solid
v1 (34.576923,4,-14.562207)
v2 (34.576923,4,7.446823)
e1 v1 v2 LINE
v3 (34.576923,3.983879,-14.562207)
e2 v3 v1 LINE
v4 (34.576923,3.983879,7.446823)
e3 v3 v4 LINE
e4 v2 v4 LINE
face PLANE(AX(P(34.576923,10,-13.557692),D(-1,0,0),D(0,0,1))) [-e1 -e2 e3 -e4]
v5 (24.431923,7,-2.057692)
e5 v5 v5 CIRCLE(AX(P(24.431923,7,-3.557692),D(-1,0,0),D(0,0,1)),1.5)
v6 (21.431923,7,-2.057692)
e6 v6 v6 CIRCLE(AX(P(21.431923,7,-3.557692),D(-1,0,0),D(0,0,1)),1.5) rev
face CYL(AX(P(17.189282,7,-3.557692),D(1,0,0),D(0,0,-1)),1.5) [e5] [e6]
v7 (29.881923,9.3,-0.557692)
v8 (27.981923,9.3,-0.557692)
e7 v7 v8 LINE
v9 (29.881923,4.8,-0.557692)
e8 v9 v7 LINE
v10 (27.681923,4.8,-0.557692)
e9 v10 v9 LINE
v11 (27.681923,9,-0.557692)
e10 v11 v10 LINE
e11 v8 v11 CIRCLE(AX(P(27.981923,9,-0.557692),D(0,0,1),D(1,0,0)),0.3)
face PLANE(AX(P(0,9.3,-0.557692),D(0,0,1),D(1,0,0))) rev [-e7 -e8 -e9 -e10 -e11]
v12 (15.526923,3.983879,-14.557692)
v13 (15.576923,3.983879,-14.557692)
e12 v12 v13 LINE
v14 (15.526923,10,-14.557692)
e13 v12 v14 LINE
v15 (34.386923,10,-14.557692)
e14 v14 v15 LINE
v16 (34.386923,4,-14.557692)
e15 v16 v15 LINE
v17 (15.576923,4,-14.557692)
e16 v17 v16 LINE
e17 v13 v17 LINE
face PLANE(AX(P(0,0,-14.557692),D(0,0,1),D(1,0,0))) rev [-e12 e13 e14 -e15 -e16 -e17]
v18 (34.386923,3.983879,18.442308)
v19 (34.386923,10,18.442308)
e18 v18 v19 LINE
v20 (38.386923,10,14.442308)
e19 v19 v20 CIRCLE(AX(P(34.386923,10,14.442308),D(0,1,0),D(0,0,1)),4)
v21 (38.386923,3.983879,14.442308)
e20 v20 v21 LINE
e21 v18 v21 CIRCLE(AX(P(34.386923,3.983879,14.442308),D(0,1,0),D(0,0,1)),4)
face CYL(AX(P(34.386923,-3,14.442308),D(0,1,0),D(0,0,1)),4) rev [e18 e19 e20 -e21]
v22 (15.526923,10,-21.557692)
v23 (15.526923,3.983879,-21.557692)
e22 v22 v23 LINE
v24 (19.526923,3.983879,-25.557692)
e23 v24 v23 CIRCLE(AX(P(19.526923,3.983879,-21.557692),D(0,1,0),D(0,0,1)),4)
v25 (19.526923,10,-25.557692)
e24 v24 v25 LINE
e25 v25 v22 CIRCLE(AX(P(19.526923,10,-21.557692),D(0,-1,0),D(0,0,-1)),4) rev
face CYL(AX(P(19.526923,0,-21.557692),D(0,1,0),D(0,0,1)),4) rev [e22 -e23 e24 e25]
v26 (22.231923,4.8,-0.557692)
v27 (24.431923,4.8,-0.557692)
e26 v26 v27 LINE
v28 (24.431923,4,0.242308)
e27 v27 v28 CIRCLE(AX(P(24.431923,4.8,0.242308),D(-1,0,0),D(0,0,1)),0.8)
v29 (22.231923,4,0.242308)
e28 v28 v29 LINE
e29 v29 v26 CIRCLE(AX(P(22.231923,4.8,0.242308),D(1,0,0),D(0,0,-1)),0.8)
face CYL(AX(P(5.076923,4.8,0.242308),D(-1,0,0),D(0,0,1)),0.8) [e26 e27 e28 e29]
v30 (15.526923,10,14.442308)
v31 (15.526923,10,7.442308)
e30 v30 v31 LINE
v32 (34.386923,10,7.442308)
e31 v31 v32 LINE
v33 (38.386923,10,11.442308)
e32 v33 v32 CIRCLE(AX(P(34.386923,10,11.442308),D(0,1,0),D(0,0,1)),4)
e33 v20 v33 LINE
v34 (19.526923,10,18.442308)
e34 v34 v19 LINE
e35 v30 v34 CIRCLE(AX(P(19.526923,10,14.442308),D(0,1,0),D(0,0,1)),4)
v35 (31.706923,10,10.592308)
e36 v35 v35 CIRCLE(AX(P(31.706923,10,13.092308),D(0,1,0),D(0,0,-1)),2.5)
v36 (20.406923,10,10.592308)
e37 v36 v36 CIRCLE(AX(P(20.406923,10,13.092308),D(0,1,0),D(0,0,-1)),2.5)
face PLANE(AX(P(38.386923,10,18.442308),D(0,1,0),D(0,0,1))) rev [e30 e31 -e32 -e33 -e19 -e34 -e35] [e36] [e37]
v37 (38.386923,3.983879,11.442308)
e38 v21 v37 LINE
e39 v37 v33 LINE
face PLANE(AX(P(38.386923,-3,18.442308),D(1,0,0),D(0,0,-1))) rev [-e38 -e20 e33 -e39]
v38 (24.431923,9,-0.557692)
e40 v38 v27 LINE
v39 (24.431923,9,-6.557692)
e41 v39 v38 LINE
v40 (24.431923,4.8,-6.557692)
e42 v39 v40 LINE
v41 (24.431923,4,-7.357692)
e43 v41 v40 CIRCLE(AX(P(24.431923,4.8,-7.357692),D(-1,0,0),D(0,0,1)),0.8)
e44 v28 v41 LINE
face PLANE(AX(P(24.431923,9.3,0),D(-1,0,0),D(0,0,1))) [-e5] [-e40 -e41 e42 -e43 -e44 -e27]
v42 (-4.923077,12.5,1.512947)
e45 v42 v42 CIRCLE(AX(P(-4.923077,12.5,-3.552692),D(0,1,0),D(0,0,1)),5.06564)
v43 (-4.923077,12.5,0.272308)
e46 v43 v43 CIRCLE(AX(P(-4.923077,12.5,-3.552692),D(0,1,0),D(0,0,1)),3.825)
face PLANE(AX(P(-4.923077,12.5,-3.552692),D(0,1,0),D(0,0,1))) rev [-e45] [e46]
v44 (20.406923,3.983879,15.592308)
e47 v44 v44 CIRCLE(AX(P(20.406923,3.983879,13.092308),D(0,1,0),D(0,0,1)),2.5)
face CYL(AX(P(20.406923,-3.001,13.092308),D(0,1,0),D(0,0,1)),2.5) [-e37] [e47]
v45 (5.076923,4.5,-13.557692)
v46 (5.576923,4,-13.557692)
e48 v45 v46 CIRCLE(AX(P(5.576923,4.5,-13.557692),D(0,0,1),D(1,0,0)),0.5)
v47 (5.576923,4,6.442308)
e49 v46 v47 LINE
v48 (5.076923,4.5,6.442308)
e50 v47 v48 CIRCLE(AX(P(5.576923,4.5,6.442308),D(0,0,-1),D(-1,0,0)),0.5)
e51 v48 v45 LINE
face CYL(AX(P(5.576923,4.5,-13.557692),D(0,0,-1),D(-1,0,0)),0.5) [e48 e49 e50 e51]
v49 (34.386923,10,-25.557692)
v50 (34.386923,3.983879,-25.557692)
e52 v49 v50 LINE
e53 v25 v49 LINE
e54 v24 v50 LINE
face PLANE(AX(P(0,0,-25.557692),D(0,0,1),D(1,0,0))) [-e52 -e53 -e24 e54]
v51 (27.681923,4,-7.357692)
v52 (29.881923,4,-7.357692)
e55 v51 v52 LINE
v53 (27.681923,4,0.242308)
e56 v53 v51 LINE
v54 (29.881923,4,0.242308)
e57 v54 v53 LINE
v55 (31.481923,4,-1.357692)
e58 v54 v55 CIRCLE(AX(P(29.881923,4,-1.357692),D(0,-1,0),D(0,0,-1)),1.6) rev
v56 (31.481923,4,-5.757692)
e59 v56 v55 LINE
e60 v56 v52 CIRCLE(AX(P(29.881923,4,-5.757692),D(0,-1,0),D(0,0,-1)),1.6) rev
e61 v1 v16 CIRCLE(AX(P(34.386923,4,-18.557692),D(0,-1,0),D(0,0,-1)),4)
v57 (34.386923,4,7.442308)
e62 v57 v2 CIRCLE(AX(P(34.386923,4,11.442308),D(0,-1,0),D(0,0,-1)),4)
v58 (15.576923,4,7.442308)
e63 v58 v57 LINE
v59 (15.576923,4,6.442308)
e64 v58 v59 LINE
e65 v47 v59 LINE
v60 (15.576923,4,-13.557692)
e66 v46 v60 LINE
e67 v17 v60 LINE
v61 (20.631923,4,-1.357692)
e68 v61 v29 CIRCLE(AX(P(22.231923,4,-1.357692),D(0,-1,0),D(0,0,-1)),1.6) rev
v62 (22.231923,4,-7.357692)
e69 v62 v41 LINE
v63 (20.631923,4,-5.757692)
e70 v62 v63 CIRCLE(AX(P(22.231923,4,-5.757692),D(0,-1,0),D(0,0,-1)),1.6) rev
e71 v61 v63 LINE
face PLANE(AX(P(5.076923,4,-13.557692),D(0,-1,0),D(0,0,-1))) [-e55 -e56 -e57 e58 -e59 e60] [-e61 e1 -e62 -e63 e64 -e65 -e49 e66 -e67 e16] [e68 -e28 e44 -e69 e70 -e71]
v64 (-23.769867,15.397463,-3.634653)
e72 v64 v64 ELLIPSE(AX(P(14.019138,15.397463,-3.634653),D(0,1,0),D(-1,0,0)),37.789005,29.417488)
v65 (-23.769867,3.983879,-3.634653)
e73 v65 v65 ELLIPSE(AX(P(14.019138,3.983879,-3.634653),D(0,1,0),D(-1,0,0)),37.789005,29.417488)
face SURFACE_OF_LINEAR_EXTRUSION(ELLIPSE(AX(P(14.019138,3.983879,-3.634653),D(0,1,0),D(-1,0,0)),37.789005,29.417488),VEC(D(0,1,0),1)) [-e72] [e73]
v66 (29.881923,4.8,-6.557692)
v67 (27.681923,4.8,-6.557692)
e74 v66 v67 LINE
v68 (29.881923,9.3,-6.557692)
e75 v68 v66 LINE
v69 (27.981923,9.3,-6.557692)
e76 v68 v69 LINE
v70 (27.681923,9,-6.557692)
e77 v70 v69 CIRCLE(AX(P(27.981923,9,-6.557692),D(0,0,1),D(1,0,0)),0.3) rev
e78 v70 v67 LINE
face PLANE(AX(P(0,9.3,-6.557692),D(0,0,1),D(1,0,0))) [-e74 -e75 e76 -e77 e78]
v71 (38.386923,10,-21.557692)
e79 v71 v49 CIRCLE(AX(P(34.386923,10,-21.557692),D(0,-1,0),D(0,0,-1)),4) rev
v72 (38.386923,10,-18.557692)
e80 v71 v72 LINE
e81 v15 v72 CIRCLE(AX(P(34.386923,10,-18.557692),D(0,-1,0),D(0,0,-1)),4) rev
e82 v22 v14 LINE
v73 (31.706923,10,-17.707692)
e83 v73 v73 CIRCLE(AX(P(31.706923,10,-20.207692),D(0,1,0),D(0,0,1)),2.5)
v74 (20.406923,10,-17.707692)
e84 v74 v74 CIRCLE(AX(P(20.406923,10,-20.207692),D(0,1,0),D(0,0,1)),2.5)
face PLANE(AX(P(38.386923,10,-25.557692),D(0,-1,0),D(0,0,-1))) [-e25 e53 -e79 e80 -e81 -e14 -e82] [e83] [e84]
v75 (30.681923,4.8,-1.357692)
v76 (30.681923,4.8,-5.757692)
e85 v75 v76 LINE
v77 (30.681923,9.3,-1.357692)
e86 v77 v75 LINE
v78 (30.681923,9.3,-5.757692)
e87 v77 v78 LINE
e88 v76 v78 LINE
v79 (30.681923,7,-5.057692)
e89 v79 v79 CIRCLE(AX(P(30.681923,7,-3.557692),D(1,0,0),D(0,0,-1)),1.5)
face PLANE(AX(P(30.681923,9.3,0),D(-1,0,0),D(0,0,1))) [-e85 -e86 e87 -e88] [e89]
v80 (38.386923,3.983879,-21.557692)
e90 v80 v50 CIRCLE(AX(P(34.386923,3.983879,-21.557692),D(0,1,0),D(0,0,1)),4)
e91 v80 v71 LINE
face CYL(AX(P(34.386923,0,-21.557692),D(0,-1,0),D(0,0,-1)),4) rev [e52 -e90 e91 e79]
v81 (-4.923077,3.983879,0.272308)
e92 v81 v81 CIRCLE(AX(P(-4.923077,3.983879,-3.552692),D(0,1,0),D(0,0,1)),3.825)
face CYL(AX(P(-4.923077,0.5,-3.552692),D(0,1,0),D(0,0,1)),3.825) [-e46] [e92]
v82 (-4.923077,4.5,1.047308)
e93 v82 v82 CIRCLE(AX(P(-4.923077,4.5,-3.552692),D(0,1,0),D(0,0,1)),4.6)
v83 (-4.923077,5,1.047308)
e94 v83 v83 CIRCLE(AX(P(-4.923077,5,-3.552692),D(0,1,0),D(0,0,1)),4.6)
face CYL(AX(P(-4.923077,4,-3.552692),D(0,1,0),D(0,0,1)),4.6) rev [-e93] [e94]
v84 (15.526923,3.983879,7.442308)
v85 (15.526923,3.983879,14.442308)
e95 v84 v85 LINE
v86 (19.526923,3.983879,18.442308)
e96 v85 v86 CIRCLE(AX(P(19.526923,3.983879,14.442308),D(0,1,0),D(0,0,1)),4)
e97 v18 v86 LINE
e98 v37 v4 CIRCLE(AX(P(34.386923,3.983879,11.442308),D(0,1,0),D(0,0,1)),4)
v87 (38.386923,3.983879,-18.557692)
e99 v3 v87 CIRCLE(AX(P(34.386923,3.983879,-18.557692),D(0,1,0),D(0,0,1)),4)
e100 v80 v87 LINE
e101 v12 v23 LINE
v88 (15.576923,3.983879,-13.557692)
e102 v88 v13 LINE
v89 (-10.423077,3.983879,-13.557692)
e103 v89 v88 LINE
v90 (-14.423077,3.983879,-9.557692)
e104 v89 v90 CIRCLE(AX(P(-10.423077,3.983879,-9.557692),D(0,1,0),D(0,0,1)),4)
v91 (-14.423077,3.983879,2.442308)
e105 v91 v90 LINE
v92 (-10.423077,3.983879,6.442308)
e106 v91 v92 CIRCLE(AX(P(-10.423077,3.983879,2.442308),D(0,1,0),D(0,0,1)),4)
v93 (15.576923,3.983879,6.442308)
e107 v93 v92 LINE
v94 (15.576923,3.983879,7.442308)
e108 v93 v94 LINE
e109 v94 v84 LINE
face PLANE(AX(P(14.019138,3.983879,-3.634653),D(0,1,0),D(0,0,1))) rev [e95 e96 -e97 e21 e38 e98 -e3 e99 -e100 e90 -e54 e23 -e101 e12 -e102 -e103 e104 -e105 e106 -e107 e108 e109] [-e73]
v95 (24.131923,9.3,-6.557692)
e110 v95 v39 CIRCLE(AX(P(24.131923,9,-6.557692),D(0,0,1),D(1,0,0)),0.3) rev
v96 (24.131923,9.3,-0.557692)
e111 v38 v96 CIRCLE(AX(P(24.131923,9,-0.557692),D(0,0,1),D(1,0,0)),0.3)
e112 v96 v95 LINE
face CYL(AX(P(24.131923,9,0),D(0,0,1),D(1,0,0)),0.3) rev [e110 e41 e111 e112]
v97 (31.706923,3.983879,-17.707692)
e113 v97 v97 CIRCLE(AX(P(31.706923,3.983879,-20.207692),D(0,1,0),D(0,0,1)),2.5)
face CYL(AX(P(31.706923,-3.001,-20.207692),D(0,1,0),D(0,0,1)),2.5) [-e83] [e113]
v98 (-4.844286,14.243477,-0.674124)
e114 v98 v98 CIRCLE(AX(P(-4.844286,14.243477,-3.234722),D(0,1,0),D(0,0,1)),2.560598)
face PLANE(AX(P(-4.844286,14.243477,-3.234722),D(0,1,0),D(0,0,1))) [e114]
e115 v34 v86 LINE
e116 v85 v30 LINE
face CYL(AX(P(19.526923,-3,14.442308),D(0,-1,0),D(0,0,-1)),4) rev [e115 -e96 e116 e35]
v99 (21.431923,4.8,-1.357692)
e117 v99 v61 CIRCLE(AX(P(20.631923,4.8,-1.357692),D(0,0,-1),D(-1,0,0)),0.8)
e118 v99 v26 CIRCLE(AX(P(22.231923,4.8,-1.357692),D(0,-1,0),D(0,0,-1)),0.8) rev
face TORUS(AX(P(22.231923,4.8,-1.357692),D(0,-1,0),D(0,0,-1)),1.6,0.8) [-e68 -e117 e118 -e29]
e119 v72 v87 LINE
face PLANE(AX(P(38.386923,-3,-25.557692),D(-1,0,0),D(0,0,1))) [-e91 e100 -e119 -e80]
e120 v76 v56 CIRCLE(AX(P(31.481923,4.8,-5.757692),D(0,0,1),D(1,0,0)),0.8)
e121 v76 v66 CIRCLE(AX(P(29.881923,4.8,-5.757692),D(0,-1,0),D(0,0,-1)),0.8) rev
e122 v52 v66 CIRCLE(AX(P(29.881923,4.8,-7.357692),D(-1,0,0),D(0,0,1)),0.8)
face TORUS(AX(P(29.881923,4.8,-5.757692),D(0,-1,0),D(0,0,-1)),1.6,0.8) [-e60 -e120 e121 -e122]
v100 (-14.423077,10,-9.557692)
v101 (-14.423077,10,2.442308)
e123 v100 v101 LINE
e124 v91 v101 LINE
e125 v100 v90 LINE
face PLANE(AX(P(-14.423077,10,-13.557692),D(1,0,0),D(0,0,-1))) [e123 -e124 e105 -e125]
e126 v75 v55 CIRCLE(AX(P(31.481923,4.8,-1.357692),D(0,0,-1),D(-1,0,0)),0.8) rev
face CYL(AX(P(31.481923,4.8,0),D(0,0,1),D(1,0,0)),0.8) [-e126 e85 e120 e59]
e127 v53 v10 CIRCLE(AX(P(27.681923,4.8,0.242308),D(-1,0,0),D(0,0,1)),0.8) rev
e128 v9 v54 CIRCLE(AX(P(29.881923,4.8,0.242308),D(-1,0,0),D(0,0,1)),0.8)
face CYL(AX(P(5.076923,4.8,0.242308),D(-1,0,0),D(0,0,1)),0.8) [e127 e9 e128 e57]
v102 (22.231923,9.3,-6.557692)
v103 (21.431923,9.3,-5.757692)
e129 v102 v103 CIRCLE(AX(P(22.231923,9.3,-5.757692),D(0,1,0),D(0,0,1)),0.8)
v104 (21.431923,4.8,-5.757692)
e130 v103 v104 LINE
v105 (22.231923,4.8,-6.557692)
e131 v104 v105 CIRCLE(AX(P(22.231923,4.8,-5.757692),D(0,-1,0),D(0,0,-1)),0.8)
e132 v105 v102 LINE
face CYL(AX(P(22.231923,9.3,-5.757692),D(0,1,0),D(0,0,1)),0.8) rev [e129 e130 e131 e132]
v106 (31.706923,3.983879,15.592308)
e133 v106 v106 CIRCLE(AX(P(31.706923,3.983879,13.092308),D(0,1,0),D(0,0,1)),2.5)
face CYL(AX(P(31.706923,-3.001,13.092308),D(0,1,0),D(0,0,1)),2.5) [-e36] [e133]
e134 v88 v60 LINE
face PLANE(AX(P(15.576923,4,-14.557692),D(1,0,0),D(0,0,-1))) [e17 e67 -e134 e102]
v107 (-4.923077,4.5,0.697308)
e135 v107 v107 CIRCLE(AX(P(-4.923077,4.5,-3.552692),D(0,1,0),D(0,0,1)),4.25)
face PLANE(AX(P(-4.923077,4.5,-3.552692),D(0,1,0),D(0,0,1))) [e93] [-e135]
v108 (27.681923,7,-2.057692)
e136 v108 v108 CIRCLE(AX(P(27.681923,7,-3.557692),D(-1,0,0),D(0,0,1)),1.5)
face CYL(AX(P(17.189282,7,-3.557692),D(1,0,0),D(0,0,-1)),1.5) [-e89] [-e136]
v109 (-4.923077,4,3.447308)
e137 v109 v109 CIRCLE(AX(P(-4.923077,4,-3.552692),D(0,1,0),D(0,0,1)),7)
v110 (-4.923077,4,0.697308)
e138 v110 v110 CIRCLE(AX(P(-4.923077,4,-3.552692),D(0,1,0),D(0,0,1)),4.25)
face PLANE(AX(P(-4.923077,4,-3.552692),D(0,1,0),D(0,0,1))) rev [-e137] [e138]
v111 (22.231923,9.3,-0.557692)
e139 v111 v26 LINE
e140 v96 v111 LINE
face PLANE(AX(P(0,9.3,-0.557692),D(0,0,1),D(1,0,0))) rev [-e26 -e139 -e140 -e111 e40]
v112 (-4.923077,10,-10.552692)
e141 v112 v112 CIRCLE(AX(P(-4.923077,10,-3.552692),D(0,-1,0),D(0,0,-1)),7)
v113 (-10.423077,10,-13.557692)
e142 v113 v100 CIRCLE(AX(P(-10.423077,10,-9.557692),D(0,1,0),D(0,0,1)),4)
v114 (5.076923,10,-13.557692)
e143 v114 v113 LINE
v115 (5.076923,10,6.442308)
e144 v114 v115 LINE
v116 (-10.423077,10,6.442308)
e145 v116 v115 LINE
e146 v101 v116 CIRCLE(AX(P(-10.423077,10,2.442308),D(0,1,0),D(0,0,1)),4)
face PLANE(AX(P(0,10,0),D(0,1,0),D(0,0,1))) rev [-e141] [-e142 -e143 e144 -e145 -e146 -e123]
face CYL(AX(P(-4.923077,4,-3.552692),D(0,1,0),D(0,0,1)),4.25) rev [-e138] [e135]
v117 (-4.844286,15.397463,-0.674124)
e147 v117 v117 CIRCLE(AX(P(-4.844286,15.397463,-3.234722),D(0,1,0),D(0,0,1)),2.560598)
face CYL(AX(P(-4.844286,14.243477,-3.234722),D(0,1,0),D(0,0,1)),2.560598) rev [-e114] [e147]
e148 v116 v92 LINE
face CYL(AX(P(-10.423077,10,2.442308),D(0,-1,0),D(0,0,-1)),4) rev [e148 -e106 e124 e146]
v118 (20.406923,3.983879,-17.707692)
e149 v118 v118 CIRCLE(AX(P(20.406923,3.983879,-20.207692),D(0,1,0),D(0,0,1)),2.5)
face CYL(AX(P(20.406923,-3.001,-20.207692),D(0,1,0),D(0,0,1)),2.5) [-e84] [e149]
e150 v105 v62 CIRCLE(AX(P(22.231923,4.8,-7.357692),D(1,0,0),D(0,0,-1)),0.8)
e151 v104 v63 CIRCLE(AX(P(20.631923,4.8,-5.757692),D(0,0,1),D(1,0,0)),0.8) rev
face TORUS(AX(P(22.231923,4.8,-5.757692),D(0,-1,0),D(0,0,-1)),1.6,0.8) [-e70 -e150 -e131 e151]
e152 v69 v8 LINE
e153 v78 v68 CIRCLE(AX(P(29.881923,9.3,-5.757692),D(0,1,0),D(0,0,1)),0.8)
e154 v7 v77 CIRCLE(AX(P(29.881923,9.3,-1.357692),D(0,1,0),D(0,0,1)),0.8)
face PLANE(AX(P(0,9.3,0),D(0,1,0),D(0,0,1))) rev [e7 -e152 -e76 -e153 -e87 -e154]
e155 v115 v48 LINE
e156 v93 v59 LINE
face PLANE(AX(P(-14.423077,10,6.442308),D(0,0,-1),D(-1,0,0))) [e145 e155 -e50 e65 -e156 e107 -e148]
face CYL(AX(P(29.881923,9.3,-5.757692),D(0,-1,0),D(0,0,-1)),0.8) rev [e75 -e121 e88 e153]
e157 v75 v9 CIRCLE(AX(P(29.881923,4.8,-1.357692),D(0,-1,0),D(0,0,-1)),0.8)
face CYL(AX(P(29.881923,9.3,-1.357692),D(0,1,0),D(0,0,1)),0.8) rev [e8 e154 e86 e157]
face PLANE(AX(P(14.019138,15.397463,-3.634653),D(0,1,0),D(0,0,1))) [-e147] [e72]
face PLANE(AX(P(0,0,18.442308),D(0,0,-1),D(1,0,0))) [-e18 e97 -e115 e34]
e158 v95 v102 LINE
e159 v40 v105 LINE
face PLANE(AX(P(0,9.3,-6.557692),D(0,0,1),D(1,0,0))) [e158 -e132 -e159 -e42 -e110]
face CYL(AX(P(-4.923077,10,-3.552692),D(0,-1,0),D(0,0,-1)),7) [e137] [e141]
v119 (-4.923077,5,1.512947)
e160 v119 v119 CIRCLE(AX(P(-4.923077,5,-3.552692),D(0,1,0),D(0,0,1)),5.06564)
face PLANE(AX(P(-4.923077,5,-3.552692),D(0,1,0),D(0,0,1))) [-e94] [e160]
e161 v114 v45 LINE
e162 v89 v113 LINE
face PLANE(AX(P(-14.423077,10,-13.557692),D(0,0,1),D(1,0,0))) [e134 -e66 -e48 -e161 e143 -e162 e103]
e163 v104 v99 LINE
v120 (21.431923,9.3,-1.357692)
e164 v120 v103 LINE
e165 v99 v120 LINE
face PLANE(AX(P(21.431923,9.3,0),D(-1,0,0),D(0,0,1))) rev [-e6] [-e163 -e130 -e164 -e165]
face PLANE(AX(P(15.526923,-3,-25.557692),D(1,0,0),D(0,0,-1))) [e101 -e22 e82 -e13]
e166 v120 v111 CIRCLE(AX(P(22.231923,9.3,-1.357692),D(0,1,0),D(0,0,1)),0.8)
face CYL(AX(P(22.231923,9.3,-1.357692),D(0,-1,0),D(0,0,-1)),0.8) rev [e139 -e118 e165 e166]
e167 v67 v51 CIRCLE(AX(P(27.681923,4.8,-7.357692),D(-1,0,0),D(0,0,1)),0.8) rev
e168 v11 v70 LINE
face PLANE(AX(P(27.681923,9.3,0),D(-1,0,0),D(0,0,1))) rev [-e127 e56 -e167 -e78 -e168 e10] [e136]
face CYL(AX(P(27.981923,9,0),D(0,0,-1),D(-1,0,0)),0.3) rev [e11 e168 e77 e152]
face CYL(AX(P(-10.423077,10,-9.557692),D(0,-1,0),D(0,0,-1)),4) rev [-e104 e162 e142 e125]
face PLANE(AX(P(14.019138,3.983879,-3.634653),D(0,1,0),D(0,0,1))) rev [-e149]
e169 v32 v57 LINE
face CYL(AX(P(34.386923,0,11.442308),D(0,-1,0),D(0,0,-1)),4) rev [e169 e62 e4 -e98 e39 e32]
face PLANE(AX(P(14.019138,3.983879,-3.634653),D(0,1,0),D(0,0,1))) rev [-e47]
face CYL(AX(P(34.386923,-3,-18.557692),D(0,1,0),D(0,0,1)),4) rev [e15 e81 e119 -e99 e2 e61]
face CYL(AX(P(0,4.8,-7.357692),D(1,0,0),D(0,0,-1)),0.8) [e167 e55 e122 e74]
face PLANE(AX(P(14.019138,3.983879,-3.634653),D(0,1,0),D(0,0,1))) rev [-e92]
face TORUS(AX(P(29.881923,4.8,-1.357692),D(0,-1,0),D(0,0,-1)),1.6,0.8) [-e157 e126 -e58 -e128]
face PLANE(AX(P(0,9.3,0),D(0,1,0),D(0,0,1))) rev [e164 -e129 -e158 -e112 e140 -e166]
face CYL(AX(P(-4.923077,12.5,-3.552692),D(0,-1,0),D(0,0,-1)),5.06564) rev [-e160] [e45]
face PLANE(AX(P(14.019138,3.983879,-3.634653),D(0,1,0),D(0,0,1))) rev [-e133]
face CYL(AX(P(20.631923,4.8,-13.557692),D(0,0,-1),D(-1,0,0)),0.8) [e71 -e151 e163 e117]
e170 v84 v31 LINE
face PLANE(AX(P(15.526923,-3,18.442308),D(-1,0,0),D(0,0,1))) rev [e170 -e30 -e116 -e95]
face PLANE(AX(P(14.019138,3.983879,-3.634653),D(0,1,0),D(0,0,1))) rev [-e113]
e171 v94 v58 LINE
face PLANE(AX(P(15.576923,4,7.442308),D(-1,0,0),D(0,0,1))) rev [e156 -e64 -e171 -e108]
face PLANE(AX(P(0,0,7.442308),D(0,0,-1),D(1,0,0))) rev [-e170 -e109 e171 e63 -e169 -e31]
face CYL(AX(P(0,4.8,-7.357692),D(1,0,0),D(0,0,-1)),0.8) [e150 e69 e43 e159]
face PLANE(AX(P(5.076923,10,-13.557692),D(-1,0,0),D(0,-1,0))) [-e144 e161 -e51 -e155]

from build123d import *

# Parameters (mm, degrees)
SKETCH2_W                 = 49
SKETCH2_H                 = 20
BOSS_EXTRUDE1_DEPTH       = 10
SKETCH3_W                 = 30
SKETCH3_H                 = 3.02
CUT_EXTRUDE1_DEPTH        = 2
SKETCH4_W                 = 5
SKETCH4_H                 = 6
CUT_EXTRUDE2_DEPTH        = 5
SKETCH5_R                 = 7
CUT_EXTRUDE3_DEPTH        = 38.474986727
SKETCH12_W                = 5
SKETCH12_H                = 6
BOSS_EXTRUDE4_DEPTH       = 0.8
SKETCH14_W                = 29.5
SKETCH14_H                = 6
CUT_EXTRUDE6_DEPTH        = 42.177221974
SKETCH20_W                = 5
SKETCH20_H                = 6
BOSS_EXTRUDE6_DEPTH       = 4.2
SKETCH21_R                = 4.6
CUT_EXTRUDE8_DEPTH        = 0.5
SKETCH22_R                = 3.825
CUT_EXTRUDE9_DEPTH        = 4
SKETCH24_R                = 4.6
SKETCH24_R_2              = 4.25
CUT_EXTRUDE11_DEPTH       = 1
BOSS_EXTRUDE9_START       = 8
SKETCH26_R                = 5.065639608
SKETCH26_R_2              = 3.825
BOSS_EXTRUDE9_DEPTH       = 8
SKETCH27_R                = 7
SKETCH27_R_2              = 4.6
CUT_EXTRUDE12_DEPTH       = 1
FILLET1_R                 = 0.5
SKETCH56_R                = 2
CUT_EXTRUDE13_DEPTH       = 2
SKETCH57_W                = 3
SKETCH57_H                = 6
BOSS_EXTRUDE19_DEPTH      = 5.3
CUT_EXTRUDE14_REACH       = 50.729
SKETCH58_R                = 1.5
FILLET2_R                 = 0.3
FILLET3_R                 = 0.8
SKETCH60_W                = 19
SKETCH60_H                = 4
BOSS_EXTRUDE21_DEPTH      = 1
SKETCH59_W                = 22.86
SKETCH59_H                = 13
BOSS_EXTRUDE20_DEPTH      = 11
CUT_EXTRUDE15_REACH       = 49.914
SKETCH61_R                = 2.5
FILLET4_R                 = 4
BOSS_EXTRUDE23_DEPTH      = 11.397463213
BOSS_EXTRUDE23_DEPTH_BACK = 0.01612128
SKETCH63_RX               = 37.789005123
SKETCH63_RY               = 29.417488172
SKETCH66_R                = 2.560598318
CUT_EXTRUDE16_DEPTH       = 1.153986273


with BuildPart() as part:
    # Sketch2 → Boss-Extrude1 (new body)
    with BuildSketch(Plane(origin=(0, 0, 0), x_dir=(1, 0, 0), z_dir=(0, 1, 0))):
        with Locations((10.076923077, 3.557692308)):
            Rectangle(SKETCH2_W, SKETCH2_H)
    extrude(amount=BOSS_EXTRUDE1_DEPTH)

    # Sketch3 → Cut-Extrude1 (cut)
    with BuildSketch(Plane.XZ):
        with Locations((12.576923077, -3.557692308)):
            Rectangle(SKETCH3_W, SKETCH3_H)
    extrude(amount=-CUT_EXTRUDE1_DEPTH, mode=Mode.SUBTRACT)

    # Sketch4 → Cut-Extrude2 (cut)
    with BuildSketch(Plane.XZ):
        with Locations((-4.923076923, -3.547692308)):
            Rectangle(SKETCH4_W, SKETCH4_H)
    extrude(amount=-CUT_EXTRUDE2_DEPTH, mode=Mode.SUBTRACT)

    # Sketch5 → Cut-Extrude3 (cut, through all)
    with BuildSketch(Plane.XZ.offset(-5)):
        with Locations(Location((-4.923076923, -3.552692308, 0), (0, 0, 270))):
            Circle(SKETCH5_R)
    extrude(amount=-CUT_EXTRUDE3_DEPTH, mode=Mode.SUBTRACT)

    # Sketch12 → Boss-Extrude4 (add)
    with BuildSketch(Plane.XZ):
        with Locations((-4.923076923, -3.547692308)):
            Rectangle(SKETCH12_W, SKETCH12_H)
    extrude(amount=-BOSS_EXTRUDE4_DEPTH)

    # Sketch14 → Cut-Extrude6 (cut, through all)
    with BuildSketch(Plane.XY.offset(6.442307692)):
        with Locations((19.826923077, 7)):
            Rectangle(SKETCH14_W, SKETCH14_H)
    extrude(amount=-CUT_EXTRUDE6_DEPTH, mode=Mode.SUBTRACT)

    # Sketch20 → Boss-Extrude6 (add)
    with BuildSketch(Plane(origin=(0, 0.8, 0), x_dir=(1, 0, 0), z_dir=(0, 1, 0))):
        with Locations((-4.923076923, 3.547692308)):
            Rectangle(SKETCH20_W, SKETCH20_H)
    extrude(amount=BOSS_EXTRUDE6_DEPTH)

    # Sketch21 → Cut-Extrude8 (cut)
    with BuildSketch(Plane(origin=(0, 5, 0), x_dir=(1, 0, 0), z_dir=(0, 1, 0))):
        with Locations(Location((-4.923076923, 3.552692308, 0), (0, 0, 270))):
            Circle(SKETCH21_R)
    extrude(amount=-CUT_EXTRUDE8_DEPTH, mode=Mode.SUBTRACT)

    # Sketch22 → Cut-Extrude9 (cut)
    with BuildSketch(Plane(origin=(0, 4.5, 0), x_dir=(1, 0, 0), z_dir=(0, 1, 0))):
        with Locations(Location((-4.923076923, 3.552692308, 0), (0, 0, 270))):
            Circle(SKETCH22_R)
    extrude(amount=-CUT_EXTRUDE9_DEPTH, mode=Mode.SUBTRACT)

    # Sketch24 → Cut-Extrude11 (cut)
    with BuildSketch(Plane(origin=(0, 5, 0), x_dir=(1, 0, 0), z_dir=(0, 1, 0))):
        with Locations(Location((-4.923076923, 3.552692308, 0), (0, 0, 270))):
            Circle(SKETCH24_R)
        with Locations(Location((-4.923076923, 3.552692308, 0), (0, 0, 270))):
            Circle(SKETCH24_R_2, mode=Mode.SUBTRACT)
    extrude(amount=-CUT_EXTRUDE11_DEPTH, mode=Mode.SUBTRACT)

    # Sketch26 → Boss-Extrude9 (add)
    with BuildSketch(Plane(origin=(0, 4.5, 0), x_dir=(1, 0, 0), z_dir=(0, 1, 0)).offset(BOSS_EXTRUDE9_START)):
        with Locations(Location((-4.923076923, 3.552692308, 0), (0, 0, 90))):
            Circle(SKETCH26_R)
        with Locations(Location((-4.923076923, 3.552692308, 0), (0, 0, 270))):
            Circle(SKETCH26_R_2, mode=Mode.SUBTRACT)
    extrude(amount=-BOSS_EXTRUDE9_DEPTH)

    # Sketch27 → Cut-Extrude12 (cut)
    with BuildSketch(Plane(origin=(0, 5, 0), x_dir=(1, 0, 0), z_dir=(0, 1, 0))):
        with Locations(Location((-4.923076923, 3.552692308, 0), (0, 0, 90))):
            Circle(SKETCH27_R)
        with Locations(Location((-4.923076923, 3.552692308, 0), (0, 0, 270))):
            Circle(SKETCH27_R_2, mode=Mode.SUBTRACT)
    extrude(amount=-CUT_EXTRUDE12_DEPTH, mode=Mode.SUBTRACT)

    # Fillet1
    fillet1_edges = [part.edges().sort_by_distance(p)[0] for p in [
        (5.076923077, 4, -3.557692308),
    ]]
    fillet(fillet1_edges, radius=FILLET1_R)

    # Sketch56 → Cut-Extrude13 (cut)
    with BuildSketch(Plane.XZ):
        with Locations((28.926923077, -3.557692308)):
            Circle(SKETCH56_R)
    extrude(amount=-CUT_EXTRUDE13_DEPTH, mode=Mode.SUBTRACT)

    # Sketch57 → Boss-Extrude19 (add)
    with BuildSketch(Plane(origin=(0, 4, 0), x_dir=(1, 0, 0), z_dir=(0, 1, 0))):
        with Locations((29.181923077, 3.557692308)):
            Rectangle(SKETCH57_W, SKETCH57_H)
        with Locations((22.931923077, 3.557692308)):
            Rectangle(SKETCH57_W, SKETCH57_H)
    extrude(amount=BOSS_EXTRUDE19_DEPTH)

    # Cut-Extrude14: up to this face of the body (flat: up to its plane)
    cut_extrude14_end = Plane(part.part.faces().sort_by_distance((21.431923077, 6.65, -3.557692308))[0])
    # Sketch58 → Cut-Extrude14 (cut, up to the picked face)
    with BuildSketch(Plane(origin=(30.681923077, 0, 0), x_dir=(0, 0, -1), z_dir=(1, 0, 0)), mode=Mode.PRIVATE) as cut_extrude14_sk1:
        with Locations(Location((3.557692308, 7, 0), (0, 0, 180))):
            Circle(SKETCH58_R)
    cut_extrude14_tool1 = split(extrude(cut_extrude14_sk1.sketch, amount=-CUT_EXTRUDE14_REACH, mode=Mode.PRIVATE), bisect_by=cut_extrude14_end, keep=Keep.BOTH, mode=Mode.PRIVATE)
    add(cut_extrude14_tool1.solids().sort_by(Axis((30.681923, 7, -3.557692), (-1, 0, 0)))[0], mode=Mode.SUBTRACT)

    # Fillet2
    fillet2_edges = [part.edges().sort_by_distance(p)[0] for p in [
        (27.681923077, 9.3, -3.557692308),
        (24.431923077, 9.3, -3.557692308),
    ]]
    fillet(fillet2_edges, radius=FILLET2_R)

    # Fillet3
    fillet3_edges = [part.edges().sort_by_distance(p)[0] for p in [
        (30.681923077, 4, -3.557692308),
        (30.681923077, 6.65, -0.557692308),
        (29.181923077, 4, -6.557692308),
        (30.681923077, 6.65, -6.557692308),
        (29.181923077, 4, -0.557692308),
        (21.431923077, 6.65, -6.557692308),
        (21.431923077, 6.65, -0.557692308),
        (22.931923077, 4, -6.557692308),
        (21.431923077, 4, -3.557692308),
        (22.931923077, 4, -0.557692308),
    ]]
    fillet(fillet3_edges, radius=FILLET3_R)

    # Sketch60 → Boss-Extrude21 (add)
    with BuildSketch(Plane(origin=(0, 0, -13.557692308), x_dir=(-1, 0, 0), z_dir=(0, 0, -1))):
        with Locations((-25.076923077, 2)):
            Rectangle(SKETCH60_W, SKETCH60_H)
    boss_extrude21 = extrude(amount=BOSS_EXTRUDE21_DEPTH)

    # Sketch59 → Boss-Extrude20 (add)
    with BuildSketch(Plane(origin=(0, 0, -14.557692308), x_dir=(-1, 0, 0), z_dir=(0, 0, -1))):
        with Locations((-26.956923077, 3.5)):
            Rectangle(SKETCH59_W, SKETCH59_H)
    boss_extrude20 = extrude(amount=BOSS_EXTRUDE20_DEPTH)

    # Mirror4: Boss-Extrude21, Boss-Extrude20 across plane
    add(boss_extrude21.mirror(Plane(origin=(0, 0, -3.557692308), x_dir=(1, 0, 0), z_dir=(0, 0, -1))))
    add(boss_extrude20.mirror(Plane(origin=(0, 0, -3.557692308), x_dir=(1, 0, 0), z_dir=(0, 0, -1))))

    # Sketch61 → Cut-Extrude15 (cut, up to next)
    with BuildSketch(Plane(origin=(0, 10, 0), x_dir=(1, 0, 0), z_dir=(0, 1, 0)), mode=Mode.PRIVATE) as cut_extrude15_sk1:
        with Locations(Location((20.406923077, 20.207692308, 0), (0, 0, 270))):
            Circle(SKETCH61_R)
    cut_extrude15_tool1 = extrude(cut_extrude15_sk1.sketch, amount=-CUT_EXTRUDE15_REACH, mode=Mode.PRIVATE) & part.part
    # Sketch61 → Cut-Extrude15 (cut, up to next)
    with BuildSketch(Plane(origin=(0, 10, 0), x_dir=(1, 0, 0), z_dir=(0, 1, 0)), mode=Mode.PRIVATE) as cut_extrude15_sk2:
        with Locations(Location((31.706923077, 20.207692308, 0), (0, 0, 270))):
            Circle(SKETCH61_R)
    cut_extrude15_tool2 = extrude(cut_extrude15_sk2.sketch, amount=-CUT_EXTRUDE15_REACH, mode=Mode.PRIVATE) & part.part
    # Sketch61 → Cut-Extrude15 (cut, up to next)
    with BuildSketch(Plane(origin=(0, 10, 0), x_dir=(1, 0, 0), z_dir=(0, 1, 0)), mode=Mode.PRIVATE) as cut_extrude15_sk3:
        with Locations(Location((31.706923077, -13.092307692, 0), (0, 0, 90))):
            Circle(SKETCH61_R)
    cut_extrude15_tool3 = extrude(cut_extrude15_sk3.sketch, amount=-CUT_EXTRUDE15_REACH, mode=Mode.PRIVATE) & part.part
    # Sketch61 → Cut-Extrude15 (cut, up to next)
    with BuildSketch(Plane(origin=(0, 10, 0), x_dir=(1, 0, 0), z_dir=(0, 1, 0)), mode=Mode.PRIVATE) as cut_extrude15_sk4:
        with Locations(Location((20.406923077, -13.092307692, 0), (0, 0, 90))):
            Circle(SKETCH61_R)
    cut_extrude15_tool4 = extrude(cut_extrude15_sk4.sketch, amount=-CUT_EXTRUDE15_REACH, mode=Mode.PRIVATE) & part.part
    add(cut_extrude15_tool1.solids().sort_by_distance((20.406923, 10, -20.207692))[0], mode=Mode.SUBTRACT)
    add(cut_extrude15_tool2.solids().sort_by_distance((31.706923, 10, -20.207692))[0], mode=Mode.SUBTRACT)
    add(cut_extrude15_tool3.solids().sort_by_distance((31.706923, 10, 13.092308))[0], mode=Mode.SUBTRACT)
    add(cut_extrude15_tool4.solids().sort_by_distance((20.406923, 10, 13.092308))[0], mode=Mode.SUBTRACT)

    # Fillet4
    # the kernel refuses this fillet: 4 mm, written as the material it takes off along each edge
    with BuildSketch(Plane(origin=(38.386923077, 20, -25.557692308), x_dir=(0, 0, 1), z_dir=(0, -1, 0)), Plane(origin=(15.526923077, -13, -25.557692308), x_dir=(0, 0, 1), z_dir=(0, 1, 0)), Plane(origin=(15.526923077, -13, 18.442307692), x_dir=(1, 0, 0), z_dir=(0, 1, 0))) as fillet4_piece_1:
        with BuildLine():
            CenterArc((FILLET4_R, FILLET4_R), FILLET4_R, 180, 90)
            Line((0, FILLET4_R), (0, 0))
            Line((0, 0), (FILLET4_R, 0))
        make_face()
    extrude(amount=33, mode=Mode.SUBTRACT)
    with BuildSketch(Plane(origin=(38.386923077, 20, -14.557692308), x_dir=(-1, 0, 0), z_dir=(0, -1, 0))) as fillet4_piece_2_section:
        with BuildLine():
            CenterArc((FILLET4_R, FILLET4_R), FILLET4_R, 180, 90)
            Line((0, FILLET4_R), (0, 0))
            Line((0, 0), (FILLET4_R, 0))
        make_face()
    fillet4_piece_2 = extrude(amount=33, mode=Mode.PRIVATE)
    fillet4_piece_2 = split(fillet4_piece_2, bisect_by=Plane(origin=(34.576923077, 12, -14.51845576), z_dir=(-1, 0, 0)), keep=Keep.TOP, mode=Mode.PRIVATE)
    fillet4_piece_2 = split(fillet4_piece_2, bisect_by=Plane(origin=(34.482800084, 4, -14.51845576), z_dir=(0, 1, 0)), keep=Keep.TOP, mode=Mode.PRIVATE)
    add(fillet4_piece_2, mode=Mode.SUBTRACT)
    with BuildSketch(Plane(origin=(38.386923077, 20, -14.557692308), x_dir=(-1, 0, 0), z_dir=(0, -1, 0))) as fillet4_piece_3_section:
        with BuildLine():
            CenterArc((FILLET4_R, FILLET4_R), FILLET4_R, 180, 90)
            Line((0, FILLET4_R), (0, 0))
            Line((0, 0), (FILLET4_R, 0))
        make_face()
    fillet4_piece_3 = extrude(amount=33, mode=Mode.PRIVATE)
    fillet4_piece_3 = split(fillet4_piece_3, bisect_by=Plane(origin=(34.576923077, 12, -15.466872512), z_dir=(1, 0, 0)), keep=Keep.TOP, mode=Mode.PRIVATE)
    fillet4_piece_3 = split(fillet4_piece_3, bisect_by=Plane(origin=(37.49276705, 4, -15.466872512), z_dir=(0, 1, 0)), keep=Keep.TOP, mode=Mode.PRIVATE)
    add(fillet4_piece_3, mode=Mode.SUBTRACT)
    with BuildSketch(Plane(origin=(38.386923077, 20, -14.557692308), x_dir=(-1, 0, 0), z_dir=(0, -1, 0))) as fillet4_piece_4_section:
        with BuildLine():
            CenterArc((FILLET4_R, FILLET4_R), FILLET4_R, 180, 90)
            Line((0, FILLET4_R), (0, 0))
            Line((0, 0), (FILLET4_R, 0))
        make_face()
    fillet4_piece_4 = extrude(amount=33, mode=Mode.PRIVATE)
    fillet4_piece_4 = split(fillet4_piece_4, bisect_by=Plane(origin=(34.576923077, 2, -15.466872512), z_dir=(1, 0, 0)), keep=Keep.TOP, mode=Mode.PRIVATE)
    fillet4_piece_4 = split(fillet4_piece_4, bisect_by=Plane(origin=(37.49276705, 0, -15.466872512), z_dir=(0, 1, 0)), keep=Keep.TOP, mode=Mode.PRIVATE)
    fillet4_piece_4 = split(fillet4_piece_4, bisect_by=Plane(origin=(37.49276705, 4, -15.466872512), z_dir=(0, -1, 0)), keep=Keep.TOP, mode=Mode.PRIVATE)
    add(fillet4_piece_4, mode=Mode.SUBTRACT)
    with BuildSketch(Plane(origin=(38.386923077, 20, -14.557692308), x_dir=(-1, 0, 0), z_dir=(0, -1, 0))) as fillet4_piece_5_section:
        with BuildLine():
            CenterArc((FILLET4_R, FILLET4_R), FILLET4_R, 180, 90)
            Line((0, FILLET4_R), (0, 0))
            Line((0, 0), (FILLET4_R, 0))
        make_face()
    fillet4_piece_5 = extrude(amount=33, mode=Mode.PRIVATE)
    fillet4_piece_5 = split(fillet4_piece_5, bisect_by=Plane(origin=(34.576923077, -6.5, -14.51845576), z_dir=(-1, 0, 0)), keep=Keep.TOP, mode=Mode.PRIVATE)
    fillet4_piece_5 = split(fillet4_piece_5, bisect_by=Plane(origin=(34.482800084, 0, -14.51845576), z_dir=(0, -1, 0)), keep=Keep.TOP, mode=Mode.PRIVATE)
    add(fillet4_piece_5, mode=Mode.SUBTRACT)
    with BuildSketch(Plane(origin=(38.386923077, 20, -14.557692308), x_dir=(-1, 0, 0), z_dir=(0, -1, 0))) as fillet4_piece_6_section:
        with BuildLine():
            CenterArc((FILLET4_R, FILLET4_R), FILLET4_R, 180, 90)
            Line((0, FILLET4_R), (0, 0))
            Line((0, 0), (FILLET4_R, 0))
        make_face()
    fillet4_piece_6 = extrude(amount=33, mode=Mode.PRIVATE)
    fillet4_piece_6 = split(fillet4_piece_6, bisect_by=Plane(origin=(34.576923077, -6.5, -15.466872512), z_dir=(1, 0, 0)), keep=Keep.TOP, mode=Mode.PRIVATE)
    fillet4_piece_6 = split(fillet4_piece_6, bisect_by=Plane(origin=(37.49276705, 0, -15.466872512), z_dir=(0, -1, 0)), keep=Keep.TOP, mode=Mode.PRIVATE)
    add(fillet4_piece_6, mode=Mode.SUBTRACT)
    with BuildSketch(Plane(origin=(38.386923077, 20, 7.442307692), x_dir=(0, 0, 1), z_dir=(0, -1, 0))) as fillet4_piece_7_section:
        with BuildLine():
            CenterArc((FILLET4_R, FILLET4_R), FILLET4_R, 180, 90)
            Line((0, FILLET4_R), (0, 0))
            Line((0, 0), (FILLET4_R, 0))
        make_face()
    fillet4_piece_7 = extrude(amount=33, mode=Mode.PRIVATE)
    fillet4_piece_7 = split(fillet4_piece_7, bisect_by=Plane(origin=(34.576923077, 12, 8.351487897), z_dir=(1, 0, 0)), keep=Keep.TOP, mode=Mode.PRIVATE)
    fillet4_piece_7 = split(fillet4_piece_7, bisect_by=Plane(origin=(37.49276705, 4, 8.351487897), z_dir=(0, 1, 0)), keep=Keep.TOP, mode=Mode.PRIVATE)
    add(fillet4_piece_7, mode=Mode.SUBTRACT)
    with BuildSketch(Plane(origin=(38.386923077, 20, 7.442307692), x_dir=(0, 0, 1), z_dir=(0, -1, 0))) as fillet4_piece_8_section:
        with BuildLine():
            CenterArc((FILLET4_R, FILLET4_R), FILLET4_R, 180, 90)
            Line((0, FILLET4_R), (0, 0))
            Line((0, 0), (FILLET4_R, 0))
        make_face()
    fillet4_piece_8 = extrude(amount=33, mode=Mode.PRIVATE)
    fillet4_piece_8 = split(fillet4_piece_8, bisect_by=Plane(origin=(34.576923077, 12, 7.403071145), z_dir=(-1, 0, 0)), keep=Keep.TOP, mode=Mode.PRIVATE)
    fillet4_piece_8 = split(fillet4_piece_8, bisect_by=Plane(origin=(34.482800084, 4, 7.403071145), z_dir=(0, 1, 0)), keep=Keep.TOP, mode=Mode.PRIVATE)
    add(fillet4_piece_8, mode=Mode.SUBTRACT)
    with BuildSketch(Plane(origin=(38.386923077, 20, 7.442307692), x_dir=(0, 0, 1), z_dir=(0, -1, 0))) as fillet4_piece_9_section:
        with BuildLine():
            CenterArc((FILLET4_R, FILLET4_R), FILLET4_R, 180, 90)
            Line((0, FILLET4_R), (0, 0))
            Line((0, 0), (FILLET4_R, 0))
        make_face()
    fillet4_piece_9 = extrude(amount=33, mode=Mode.PRIVATE)
    fillet4_piece_9 = split(fillet4_piece_9, bisect_by=Plane(origin=(34.576923077, 2, 8.351487897), z_dir=(1, 0, 0)), keep=Keep.TOP, mode=Mode.PRIVATE)
    fillet4_piece_9 = split(fillet4_piece_9, bisect_by=Plane(origin=(37.49276705, 0, 8.351487897), z_dir=(0, 1, 0)), keep=Keep.TOP, mode=Mode.PRIVATE)
    fillet4_piece_9 = split(fillet4_piece_9, bisect_by=Plane(origin=(37.49276705, 4, 8.351487897), z_dir=(0, -1, 0)), keep=Keep.TOP, mode=Mode.PRIVATE)
    add(fillet4_piece_9, mode=Mode.SUBTRACT)
    with BuildSketch(Plane(origin=(38.386923077, 20, 7.442307692), x_dir=(0, 0, 1), z_dir=(0, -1, 0))) as fillet4_piece_10_section:
        with BuildLine():
            CenterArc((FILLET4_R, FILLET4_R), FILLET4_R, 180, 90)
            Line((0, FILLET4_R), (0, 0))
            Line((0, 0), (FILLET4_R, 0))
        make_face()
    fillet4_piece_10 = extrude(amount=33, mode=Mode.PRIVATE)
    fillet4_piece_10 = split(fillet4_piece_10, bisect_by=Plane(origin=(34.576923077, -6.5, 8.351487897), z_dir=(1, 0, 0)), keep=Keep.TOP, mode=Mode.PRIVATE)
    fillet4_piece_10 = split(fillet4_piece_10, bisect_by=Plane(origin=(37.49276705, 0, 8.351487897), z_dir=(0, -1, 0)), keep=Keep.TOP, mode=Mode.PRIVATE)
    add(fillet4_piece_10, mode=Mode.SUBTRACT)
    with BuildSketch(Plane(origin=(38.386923077, 20, 7.442307692), x_dir=(0, 0, 1), z_dir=(0, -1, 0))) as fillet4_piece_11_section:
        with BuildLine():
            CenterArc((FILLET4_R, FILLET4_R), FILLET4_R, 180, 90)
            Line((0, FILLET4_R), (0, 0))
            Line((0, 0), (FILLET4_R, 0))
        make_face()
    fillet4_piece_11 = extrude(amount=33, mode=Mode.PRIVATE)
    fillet4_piece_11 = split(fillet4_piece_11, bisect_by=Plane(origin=(34.576923077, -6.5, 7.403071145), z_dir=(-1, 0, 0)), keep=Keep.TOP, mode=Mode.PRIVATE)
    fillet4_piece_11 = split(fillet4_piece_11, bisect_by=Plane(origin=(34.482800084, 0, 7.403071145), z_dir=(0, -1, 0)), keep=Keep.TOP, mode=Mode.PRIVATE)
    add(fillet4_piece_11, mode=Mode.SUBTRACT)
    with BuildSketch(Plane(origin=(38.386923077, 20, 18.442307692), x_dir=(0, 0, -1), z_dir=(0, -1, 0))) as fillet4_piece_12:
        with BuildLine():
            CenterArc((FILLET4_R, -FILLET4_R), FILLET4_R, 90, 90)
            Line((0, -FILLET4_R), (0, 0))
            Line((0, 0), (FILLET4_R, 0))
        make_face()
    extrude(amount=33, mode=Mode.SUBTRACT)
    with BuildSketch(Plane(origin=(-14.423076923, -10, 6.442307692), x_dir=(1, 0, 0), z_dir=(0, 1, 0))) as fillet4_piece_13:
        with BuildLine():
            CenterArc((FILLET4_R, FILLET4_R), FILLET4_R, 180, 90)
            Line((0, FILLET4_R), (0, 0))
            Line((0, 0), (FILLET4_R, 0))
        make_face()
    extrude(amount=30, mode=Mode.SUBTRACT)
    with BuildSketch(Plane(origin=(-14.423076923, -10, -13.557692308), x_dir=(1, 0, 0), z_dir=(0, 1, 0))) as fillet4_piece_14:
        with BuildLine():
            CenterArc((FILLET4_R, -FILLET4_R), FILLET4_R, 90, 90)
            Line((0, -FILLET4_R), (0, 0))
            Line((0, 0), (FILLET4_R, 0))
        make_face()
    extrude(amount=30, mode=Mode.SUBTRACT)


with BuildPart() as body_2:
    # Sketch63 → Boss-Extrude23 (new, two sides: drawn at the far end of the back side and taken through both)
    with BuildSketch(Plane(origin=(0, 4, 0), x_dir=(-1, 0, 0), z_dir=(0, 1, 0)).offset(-BOSS_EXTRUDE23_DEPTH_BACK)):
        with Locations((-14.019138215, -3.634653101)):
            Ellipse(SKETCH63_RX, SKETCH63_RY)
    extrude(amount=BOSS_EXTRUDE23_DEPTH + BOSS_EXTRUDE23_DEPTH_BACK)

    # Combine1: cut part
    add(part.part, mode=Mode.SUBTRACT)

    # Sketch66 → Cut-Extrude16 (cut)
    with BuildSketch(Plane(origin=(0, 15.397463213, 0), x_dir=(1, 0, 0), z_dir=(0, 1, 0))):
        with Locations(Location((-4.844286355, 3.234721838, 0), (0, 0, 270))):
            Circle(SKETCH66_R)
    extrude(amount=-CUT_EXTRUDE16_DEPTH, mode=Mode.SUBTRACT)


solid = body_2.part
